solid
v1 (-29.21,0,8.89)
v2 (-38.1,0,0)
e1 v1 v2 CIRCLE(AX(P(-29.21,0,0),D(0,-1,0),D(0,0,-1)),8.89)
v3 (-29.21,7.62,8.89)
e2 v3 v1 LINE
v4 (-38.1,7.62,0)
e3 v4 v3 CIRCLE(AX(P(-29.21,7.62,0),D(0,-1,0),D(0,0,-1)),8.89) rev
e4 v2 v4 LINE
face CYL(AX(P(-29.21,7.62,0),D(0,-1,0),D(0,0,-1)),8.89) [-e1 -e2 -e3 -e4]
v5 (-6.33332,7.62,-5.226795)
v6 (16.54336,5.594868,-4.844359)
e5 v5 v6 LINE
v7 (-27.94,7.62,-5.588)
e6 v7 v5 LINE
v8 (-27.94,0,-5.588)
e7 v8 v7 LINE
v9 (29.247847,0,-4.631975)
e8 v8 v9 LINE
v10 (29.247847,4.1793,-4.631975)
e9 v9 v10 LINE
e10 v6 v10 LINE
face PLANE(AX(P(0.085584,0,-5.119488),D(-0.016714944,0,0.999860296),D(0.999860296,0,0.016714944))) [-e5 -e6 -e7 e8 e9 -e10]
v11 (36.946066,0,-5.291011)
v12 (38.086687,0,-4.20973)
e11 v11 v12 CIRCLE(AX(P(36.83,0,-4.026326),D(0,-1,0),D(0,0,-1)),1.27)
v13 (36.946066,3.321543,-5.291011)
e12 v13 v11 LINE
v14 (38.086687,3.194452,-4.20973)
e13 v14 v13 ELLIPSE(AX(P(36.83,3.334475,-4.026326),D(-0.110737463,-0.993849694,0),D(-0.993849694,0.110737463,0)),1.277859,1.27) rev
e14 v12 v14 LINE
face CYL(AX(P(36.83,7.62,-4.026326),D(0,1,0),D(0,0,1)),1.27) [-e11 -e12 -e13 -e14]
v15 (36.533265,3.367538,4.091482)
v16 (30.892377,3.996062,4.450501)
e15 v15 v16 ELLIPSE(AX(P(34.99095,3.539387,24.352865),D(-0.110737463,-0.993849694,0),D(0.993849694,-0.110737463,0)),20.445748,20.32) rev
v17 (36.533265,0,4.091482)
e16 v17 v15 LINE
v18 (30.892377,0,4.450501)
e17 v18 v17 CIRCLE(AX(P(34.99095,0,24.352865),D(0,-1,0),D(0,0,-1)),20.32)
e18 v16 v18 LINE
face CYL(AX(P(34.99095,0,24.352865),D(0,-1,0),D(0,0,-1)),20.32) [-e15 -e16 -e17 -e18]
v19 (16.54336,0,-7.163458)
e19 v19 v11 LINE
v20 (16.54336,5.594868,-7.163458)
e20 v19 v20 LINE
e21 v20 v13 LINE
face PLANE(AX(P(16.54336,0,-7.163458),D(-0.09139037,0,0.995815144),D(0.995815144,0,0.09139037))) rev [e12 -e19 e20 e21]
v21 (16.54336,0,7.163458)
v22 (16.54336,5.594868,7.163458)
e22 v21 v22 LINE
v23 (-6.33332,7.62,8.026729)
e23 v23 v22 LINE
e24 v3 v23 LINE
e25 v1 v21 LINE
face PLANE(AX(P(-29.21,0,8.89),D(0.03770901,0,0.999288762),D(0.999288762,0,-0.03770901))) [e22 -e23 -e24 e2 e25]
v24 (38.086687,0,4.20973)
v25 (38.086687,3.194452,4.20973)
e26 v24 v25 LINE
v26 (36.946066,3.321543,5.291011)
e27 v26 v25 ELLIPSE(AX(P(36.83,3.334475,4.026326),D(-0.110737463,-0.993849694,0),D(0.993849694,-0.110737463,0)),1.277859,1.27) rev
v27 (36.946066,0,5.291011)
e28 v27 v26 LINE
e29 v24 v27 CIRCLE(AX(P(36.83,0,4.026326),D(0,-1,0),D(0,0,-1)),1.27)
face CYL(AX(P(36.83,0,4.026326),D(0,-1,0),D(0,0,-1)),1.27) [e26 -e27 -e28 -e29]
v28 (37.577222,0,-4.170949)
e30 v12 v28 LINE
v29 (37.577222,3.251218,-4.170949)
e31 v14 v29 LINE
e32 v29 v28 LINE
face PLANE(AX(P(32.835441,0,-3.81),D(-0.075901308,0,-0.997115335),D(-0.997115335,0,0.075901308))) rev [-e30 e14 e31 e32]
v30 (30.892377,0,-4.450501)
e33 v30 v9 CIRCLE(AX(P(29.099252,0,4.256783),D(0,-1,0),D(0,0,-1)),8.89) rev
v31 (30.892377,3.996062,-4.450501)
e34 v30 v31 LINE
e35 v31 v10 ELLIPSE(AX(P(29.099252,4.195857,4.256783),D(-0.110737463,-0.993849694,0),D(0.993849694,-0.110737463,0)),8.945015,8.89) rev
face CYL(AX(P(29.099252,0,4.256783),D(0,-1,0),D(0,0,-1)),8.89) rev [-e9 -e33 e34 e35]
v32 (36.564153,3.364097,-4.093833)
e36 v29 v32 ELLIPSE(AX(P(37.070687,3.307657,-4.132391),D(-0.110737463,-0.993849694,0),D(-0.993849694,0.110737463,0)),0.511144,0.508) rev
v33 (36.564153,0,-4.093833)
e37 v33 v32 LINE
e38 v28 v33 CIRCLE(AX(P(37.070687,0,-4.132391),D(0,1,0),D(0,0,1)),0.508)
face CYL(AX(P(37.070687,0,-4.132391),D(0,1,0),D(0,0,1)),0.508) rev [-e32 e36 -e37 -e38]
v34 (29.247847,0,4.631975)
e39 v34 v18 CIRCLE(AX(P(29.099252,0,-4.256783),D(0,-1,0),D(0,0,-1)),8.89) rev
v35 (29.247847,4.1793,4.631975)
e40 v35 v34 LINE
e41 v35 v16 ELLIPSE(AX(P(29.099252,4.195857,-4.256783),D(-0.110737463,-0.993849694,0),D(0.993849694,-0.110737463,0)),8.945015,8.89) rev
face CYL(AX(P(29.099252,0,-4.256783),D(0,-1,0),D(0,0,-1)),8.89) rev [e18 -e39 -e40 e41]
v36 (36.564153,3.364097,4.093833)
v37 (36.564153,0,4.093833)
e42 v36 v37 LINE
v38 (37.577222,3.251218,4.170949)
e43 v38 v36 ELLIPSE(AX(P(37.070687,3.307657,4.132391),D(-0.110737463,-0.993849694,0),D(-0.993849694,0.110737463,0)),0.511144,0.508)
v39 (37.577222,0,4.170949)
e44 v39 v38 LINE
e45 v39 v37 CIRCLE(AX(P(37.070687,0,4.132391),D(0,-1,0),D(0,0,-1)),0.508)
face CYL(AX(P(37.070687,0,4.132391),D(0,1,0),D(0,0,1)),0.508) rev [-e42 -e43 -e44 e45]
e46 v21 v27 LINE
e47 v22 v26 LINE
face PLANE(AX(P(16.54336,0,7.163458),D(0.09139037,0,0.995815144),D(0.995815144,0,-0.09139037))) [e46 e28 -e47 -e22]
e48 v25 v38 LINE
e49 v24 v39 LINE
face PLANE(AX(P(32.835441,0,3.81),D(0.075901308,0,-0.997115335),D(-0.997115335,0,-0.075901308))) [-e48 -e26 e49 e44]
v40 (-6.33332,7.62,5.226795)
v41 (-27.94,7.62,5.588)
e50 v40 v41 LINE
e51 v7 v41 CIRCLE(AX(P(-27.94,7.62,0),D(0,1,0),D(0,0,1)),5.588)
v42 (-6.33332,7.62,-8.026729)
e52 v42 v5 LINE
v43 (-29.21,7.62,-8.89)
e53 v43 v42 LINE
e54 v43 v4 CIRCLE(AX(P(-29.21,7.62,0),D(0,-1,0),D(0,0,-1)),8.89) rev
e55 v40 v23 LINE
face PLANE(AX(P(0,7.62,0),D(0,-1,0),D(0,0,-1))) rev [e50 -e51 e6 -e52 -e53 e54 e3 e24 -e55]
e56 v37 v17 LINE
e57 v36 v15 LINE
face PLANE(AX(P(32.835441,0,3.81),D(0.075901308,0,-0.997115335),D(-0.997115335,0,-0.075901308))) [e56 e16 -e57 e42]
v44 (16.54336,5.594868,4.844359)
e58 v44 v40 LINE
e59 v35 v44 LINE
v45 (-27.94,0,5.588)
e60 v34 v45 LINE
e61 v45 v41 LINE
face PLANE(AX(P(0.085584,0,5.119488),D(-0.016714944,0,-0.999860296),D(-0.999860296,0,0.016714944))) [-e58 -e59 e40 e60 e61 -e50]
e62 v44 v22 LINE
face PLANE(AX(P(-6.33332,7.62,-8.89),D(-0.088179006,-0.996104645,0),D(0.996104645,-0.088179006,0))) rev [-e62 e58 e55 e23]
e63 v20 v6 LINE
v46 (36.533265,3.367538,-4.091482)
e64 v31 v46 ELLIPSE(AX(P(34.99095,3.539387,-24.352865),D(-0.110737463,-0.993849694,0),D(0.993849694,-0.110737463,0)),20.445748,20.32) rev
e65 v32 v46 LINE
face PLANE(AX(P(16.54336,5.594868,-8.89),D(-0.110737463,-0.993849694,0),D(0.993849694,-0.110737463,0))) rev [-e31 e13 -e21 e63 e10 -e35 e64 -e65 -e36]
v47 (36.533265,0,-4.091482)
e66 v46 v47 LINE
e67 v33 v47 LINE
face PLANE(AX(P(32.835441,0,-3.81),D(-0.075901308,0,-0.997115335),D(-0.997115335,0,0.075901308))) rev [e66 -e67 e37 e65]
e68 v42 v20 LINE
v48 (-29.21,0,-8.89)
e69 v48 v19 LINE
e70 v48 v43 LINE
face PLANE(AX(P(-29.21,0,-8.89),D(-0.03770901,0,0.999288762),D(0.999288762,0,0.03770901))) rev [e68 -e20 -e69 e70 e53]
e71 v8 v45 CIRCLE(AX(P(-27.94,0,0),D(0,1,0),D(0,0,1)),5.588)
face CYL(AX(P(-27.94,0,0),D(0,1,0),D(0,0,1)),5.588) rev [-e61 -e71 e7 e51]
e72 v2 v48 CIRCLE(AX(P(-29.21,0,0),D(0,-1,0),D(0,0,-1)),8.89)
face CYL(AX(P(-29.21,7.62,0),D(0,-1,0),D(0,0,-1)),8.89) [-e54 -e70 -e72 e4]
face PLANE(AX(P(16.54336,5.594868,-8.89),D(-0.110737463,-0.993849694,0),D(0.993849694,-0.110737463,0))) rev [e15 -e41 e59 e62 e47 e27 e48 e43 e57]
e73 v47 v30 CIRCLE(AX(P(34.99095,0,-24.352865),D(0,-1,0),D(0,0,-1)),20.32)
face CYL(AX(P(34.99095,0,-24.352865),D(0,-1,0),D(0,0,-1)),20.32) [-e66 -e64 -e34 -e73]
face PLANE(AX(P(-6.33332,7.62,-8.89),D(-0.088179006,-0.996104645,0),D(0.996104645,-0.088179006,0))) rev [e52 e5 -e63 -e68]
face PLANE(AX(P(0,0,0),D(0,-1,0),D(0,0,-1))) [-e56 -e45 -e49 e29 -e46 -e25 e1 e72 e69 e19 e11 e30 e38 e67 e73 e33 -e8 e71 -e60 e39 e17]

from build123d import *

# Parameters (mm, degrees)
SKETCH1_W                = 76.2
SKETCH1_H                = 17.78
BOSS_EXTRUDE1_DEPTH      = 7.62
FILLET1_R                = 8.89
CUT_EXTRUDE8_DEPTH       = 40.858581259
CUT_EXTRUDE9_DEPTH       = 40.858581259
CUT_EXTRUDE10_DEPTH      = 40.858581259
FILLET5_R                = 8.89
FILLET6_R                = 1.27
CUT_EXTRUDE11_DEPTH      = 40.858581259
SKETCH11_R               = 0.508
CUT_EXTRUDE12_DEPTH      = 40.858581259
CUT_EXTRUDE14_DEPTH      = 40.858581259
CUT_EXTRUDE14_DEPTH_BACK = 40.858581259
FILLET7_R                = 20.32


# Some blends are built 0.0001 mm under size
with BuildPart() as part:
    # Sketch1 → Boss-Extrude1 (new body)
    with BuildSketch(Plane(origin=(0, 0, 0), x_dir=(1, 0, 0), z_dir=(0, 1, 0))):
        Rectangle(SKETCH1_W, SKETCH1_H)
    extrude(amount=BOSS_EXTRUDE1_DEPTH)

    # Fillet1
    fillet1_edges = [part.edges().sort_by_distance(p)[0] for p in [
        (-38.1, 3.81, -8.89),
        (-38.1, 3.81, 8.89),
    ]]
    fillet(fillet1_edges, radius=FILLET1_R - 0.0001)  # a hair under: the kernel refuses the full size

    # Sketch2 → Cut-Extrude8 (cut, through all)
    with BuildSketch(Plane(origin=(0, 7.62, 0), x_dir=(1, 0, 0), z_dir=(0, 1, 0))):
        with BuildLine():
            Line((38.1, -3.81), (38.1, 3.81))
            Line((38.1, 3.81), (32.835440572, 3.81))
            Line((32.835440572, 3.81), (32.835440572, 4.572))
            Line((32.835440572, 4.572), (-27.94, 5.588))
            ThreePointArc((-27.94, 5.588), (-33.528, 0), (-27.94, -5.588))
            Line((-27.94, -5.588), (32.835440572, -4.572))
            Line((32.835440572, -4.572), (32.835440572, -3.81))
            Line((32.835440572, -3.81), (38.1, -3.81))
        make_face()
    extrude(amount=-CUT_EXTRUDE8_DEPTH, mode=Mode.SUBTRACT)

    # Sketch8 → Cut-Extrude9 (cut, through all)
    with BuildSketch(Plane(origin=(0, 7.62, 0), x_dir=(1, 0, 0), z_dir=(0, 1, 0))):
        Polygon((-29.21, 8.89), (38.1, 6.35), (38.1, 8.89), align=None)
    cut_extrude9 = extrude(amount=-CUT_EXTRUDE9_DEPTH, mode=Mode.SUBTRACT)

    # Mirror5: Cut-Extrude9 across plane
    add(cut_extrude9.mirror(Plane.XY), mode=Mode.SUBTRACT)

    # Sketch9 → Cut-Extrude10 (cut, through all)
    with BuildSketch(Plane(origin=(0, 7.62, 0), x_dir=(1, 0, 0), z_dir=(0, 1, 0))):
        Polygon((16.543360441, 7.163458097), (38.1, 5.185109732), (38.1, 6.35), align=None)
    cut_extrude10 = extrude(amount=-CUT_EXTRUDE10_DEPTH, mode=Mode.SUBTRACT)

    # Mirror6: Cut-Extrude10 across plane
    add(cut_extrude10.mirror(Plane.XY), mode=Mode.SUBTRACT)

    # Fillet5
    # the kernel refuses this fillet: 8.89 mm, written as the material it adds along each edge
    with BuildSketch(Plane(origin=(32.835440572, 7.62, 4.572), x_dir=(-0.999860295571869, 0, 0.01671494358156383), z_dir=(0, -1, 0))) as fillet5_piece_1:
        with BuildLine():
            CenterArc((3.588094431, 8.89), FILLET5_R, 246.106185647, 23.893814353)
            Line((-0.012736787, 0.761893545), (-0.084753411, 0.599331416))
            ThreePointArc((-0.084753411, 0.599331416), (-0.184143554, 0.377974856), (-0.177775161, -0.002971917))
            Line((-0.177775161, -0.002971917), (0, -0.1778))
            Line((0, -0.1778), (3.588094431, -0.1778))
            Line((3.588094431, -0.1778), (3.588094431, 0))
        make_face()
    extrude(amount=7.62)
    with BuildSketch(Plane(origin=(32.835440572, 7.62, -4.572), x_dir=(0, 0, 1), z_dir=(0, -1, 0))) as fillet5_piece_2:
        with BuildLine():
            CenterArc((8.828783232, 3.736189007), FILLET5_R, 180.957740323, 23.893814353)
            Line((-0.059974796, 3.587593158), (-0.237749957, 3.584621241))
            Line((-0.237749957, 3.584621241), (-0.177775161, -0.002971917))
            Line((-0.177775161, -0.002971917), (0, -0.1778))
            ThreePointArc((0, -0.1778), (0.381, -0.1778), (0.600664335, -0.07472378))
            Line((0.600664335, -0.07472378), (0.762, 0))
        make_face()
    extrude(amount=7.62)

    # Fillet6
    fillet6_edges = [part.edges().sort_by_distance(p)[0] for p in [
        (38.1, 3.81, -5.185109732),
        (38.1, 3.81, 5.185109732),
    ]]
    fillet(fillet6_edges, radius=FILLET6_R)

    # Sketch10 → Cut-Extrude11 (cut, through all)
    with BuildSketch(Plane(origin=(0, 7.62, 0), x_dir=(1, 0, 0), z_dir=(0, 1, 0))):
        Polygon((32.835440572, 3.81), (38.086687384, 4.209729588), (38.737760676, 3.81), align=None)
    cut_extrude11 = extrude(amount=-CUT_EXTRUDE11_DEPTH, mode=Mode.SUBTRACT)

    # Mirror7: Cut-Extrude11 across plane
    add(cut_extrude11.mirror(Plane.XY), mode=Mode.SUBTRACT)

    # Sketch11 → Cut-Extrude12 (cut, through all)
    with BuildSketch(Plane(origin=(0, 7.62, 0), x_dir=(1, 0, 0), z_dir=(0, 1, 0))):
        with Locations((37.070687384, 4.132390762)):
            Circle(SKETCH11_R)
    cut_extrude12 = extrude(amount=-CUT_EXTRUDE12_DEPTH, mode=Mode.SUBTRACT)

    # Mirror8: Cut-Extrude12 across plane
    add(cut_extrude12.mirror(Plane.XY), mode=Mode.SUBTRACT)

    # Sketch13 → Cut-Extrude14 (cut, two sides: drawn at the far end of the back side and taken through both)
    with BuildSketch(Plane.XY.offset(-CUT_EXTRUDE14_DEPTH_BACK)):
        Polygon((-6.333319779, 7.62), (16.543360441, 5.594868468), (38.086687384, 3.194451795), (38.086687384, 7.62), align=None)
    extrude(amount=CUT_EXTRUDE14_DEPTH + CUT_EXTRUDE14_DEPTH_BACK, mode=Mode.SUBTRACT)

    # Fillet7
    fillet7_edges = [part.edges().sort_by_distance(p)[0] for p in [
        (32.835440572, 1.889780071, -3.81),
        (32.835440572, 1.889780071, 3.81),
    ]]
    fillet(fillet7_edges, radius=FILLET7_R)


solid = part.part
